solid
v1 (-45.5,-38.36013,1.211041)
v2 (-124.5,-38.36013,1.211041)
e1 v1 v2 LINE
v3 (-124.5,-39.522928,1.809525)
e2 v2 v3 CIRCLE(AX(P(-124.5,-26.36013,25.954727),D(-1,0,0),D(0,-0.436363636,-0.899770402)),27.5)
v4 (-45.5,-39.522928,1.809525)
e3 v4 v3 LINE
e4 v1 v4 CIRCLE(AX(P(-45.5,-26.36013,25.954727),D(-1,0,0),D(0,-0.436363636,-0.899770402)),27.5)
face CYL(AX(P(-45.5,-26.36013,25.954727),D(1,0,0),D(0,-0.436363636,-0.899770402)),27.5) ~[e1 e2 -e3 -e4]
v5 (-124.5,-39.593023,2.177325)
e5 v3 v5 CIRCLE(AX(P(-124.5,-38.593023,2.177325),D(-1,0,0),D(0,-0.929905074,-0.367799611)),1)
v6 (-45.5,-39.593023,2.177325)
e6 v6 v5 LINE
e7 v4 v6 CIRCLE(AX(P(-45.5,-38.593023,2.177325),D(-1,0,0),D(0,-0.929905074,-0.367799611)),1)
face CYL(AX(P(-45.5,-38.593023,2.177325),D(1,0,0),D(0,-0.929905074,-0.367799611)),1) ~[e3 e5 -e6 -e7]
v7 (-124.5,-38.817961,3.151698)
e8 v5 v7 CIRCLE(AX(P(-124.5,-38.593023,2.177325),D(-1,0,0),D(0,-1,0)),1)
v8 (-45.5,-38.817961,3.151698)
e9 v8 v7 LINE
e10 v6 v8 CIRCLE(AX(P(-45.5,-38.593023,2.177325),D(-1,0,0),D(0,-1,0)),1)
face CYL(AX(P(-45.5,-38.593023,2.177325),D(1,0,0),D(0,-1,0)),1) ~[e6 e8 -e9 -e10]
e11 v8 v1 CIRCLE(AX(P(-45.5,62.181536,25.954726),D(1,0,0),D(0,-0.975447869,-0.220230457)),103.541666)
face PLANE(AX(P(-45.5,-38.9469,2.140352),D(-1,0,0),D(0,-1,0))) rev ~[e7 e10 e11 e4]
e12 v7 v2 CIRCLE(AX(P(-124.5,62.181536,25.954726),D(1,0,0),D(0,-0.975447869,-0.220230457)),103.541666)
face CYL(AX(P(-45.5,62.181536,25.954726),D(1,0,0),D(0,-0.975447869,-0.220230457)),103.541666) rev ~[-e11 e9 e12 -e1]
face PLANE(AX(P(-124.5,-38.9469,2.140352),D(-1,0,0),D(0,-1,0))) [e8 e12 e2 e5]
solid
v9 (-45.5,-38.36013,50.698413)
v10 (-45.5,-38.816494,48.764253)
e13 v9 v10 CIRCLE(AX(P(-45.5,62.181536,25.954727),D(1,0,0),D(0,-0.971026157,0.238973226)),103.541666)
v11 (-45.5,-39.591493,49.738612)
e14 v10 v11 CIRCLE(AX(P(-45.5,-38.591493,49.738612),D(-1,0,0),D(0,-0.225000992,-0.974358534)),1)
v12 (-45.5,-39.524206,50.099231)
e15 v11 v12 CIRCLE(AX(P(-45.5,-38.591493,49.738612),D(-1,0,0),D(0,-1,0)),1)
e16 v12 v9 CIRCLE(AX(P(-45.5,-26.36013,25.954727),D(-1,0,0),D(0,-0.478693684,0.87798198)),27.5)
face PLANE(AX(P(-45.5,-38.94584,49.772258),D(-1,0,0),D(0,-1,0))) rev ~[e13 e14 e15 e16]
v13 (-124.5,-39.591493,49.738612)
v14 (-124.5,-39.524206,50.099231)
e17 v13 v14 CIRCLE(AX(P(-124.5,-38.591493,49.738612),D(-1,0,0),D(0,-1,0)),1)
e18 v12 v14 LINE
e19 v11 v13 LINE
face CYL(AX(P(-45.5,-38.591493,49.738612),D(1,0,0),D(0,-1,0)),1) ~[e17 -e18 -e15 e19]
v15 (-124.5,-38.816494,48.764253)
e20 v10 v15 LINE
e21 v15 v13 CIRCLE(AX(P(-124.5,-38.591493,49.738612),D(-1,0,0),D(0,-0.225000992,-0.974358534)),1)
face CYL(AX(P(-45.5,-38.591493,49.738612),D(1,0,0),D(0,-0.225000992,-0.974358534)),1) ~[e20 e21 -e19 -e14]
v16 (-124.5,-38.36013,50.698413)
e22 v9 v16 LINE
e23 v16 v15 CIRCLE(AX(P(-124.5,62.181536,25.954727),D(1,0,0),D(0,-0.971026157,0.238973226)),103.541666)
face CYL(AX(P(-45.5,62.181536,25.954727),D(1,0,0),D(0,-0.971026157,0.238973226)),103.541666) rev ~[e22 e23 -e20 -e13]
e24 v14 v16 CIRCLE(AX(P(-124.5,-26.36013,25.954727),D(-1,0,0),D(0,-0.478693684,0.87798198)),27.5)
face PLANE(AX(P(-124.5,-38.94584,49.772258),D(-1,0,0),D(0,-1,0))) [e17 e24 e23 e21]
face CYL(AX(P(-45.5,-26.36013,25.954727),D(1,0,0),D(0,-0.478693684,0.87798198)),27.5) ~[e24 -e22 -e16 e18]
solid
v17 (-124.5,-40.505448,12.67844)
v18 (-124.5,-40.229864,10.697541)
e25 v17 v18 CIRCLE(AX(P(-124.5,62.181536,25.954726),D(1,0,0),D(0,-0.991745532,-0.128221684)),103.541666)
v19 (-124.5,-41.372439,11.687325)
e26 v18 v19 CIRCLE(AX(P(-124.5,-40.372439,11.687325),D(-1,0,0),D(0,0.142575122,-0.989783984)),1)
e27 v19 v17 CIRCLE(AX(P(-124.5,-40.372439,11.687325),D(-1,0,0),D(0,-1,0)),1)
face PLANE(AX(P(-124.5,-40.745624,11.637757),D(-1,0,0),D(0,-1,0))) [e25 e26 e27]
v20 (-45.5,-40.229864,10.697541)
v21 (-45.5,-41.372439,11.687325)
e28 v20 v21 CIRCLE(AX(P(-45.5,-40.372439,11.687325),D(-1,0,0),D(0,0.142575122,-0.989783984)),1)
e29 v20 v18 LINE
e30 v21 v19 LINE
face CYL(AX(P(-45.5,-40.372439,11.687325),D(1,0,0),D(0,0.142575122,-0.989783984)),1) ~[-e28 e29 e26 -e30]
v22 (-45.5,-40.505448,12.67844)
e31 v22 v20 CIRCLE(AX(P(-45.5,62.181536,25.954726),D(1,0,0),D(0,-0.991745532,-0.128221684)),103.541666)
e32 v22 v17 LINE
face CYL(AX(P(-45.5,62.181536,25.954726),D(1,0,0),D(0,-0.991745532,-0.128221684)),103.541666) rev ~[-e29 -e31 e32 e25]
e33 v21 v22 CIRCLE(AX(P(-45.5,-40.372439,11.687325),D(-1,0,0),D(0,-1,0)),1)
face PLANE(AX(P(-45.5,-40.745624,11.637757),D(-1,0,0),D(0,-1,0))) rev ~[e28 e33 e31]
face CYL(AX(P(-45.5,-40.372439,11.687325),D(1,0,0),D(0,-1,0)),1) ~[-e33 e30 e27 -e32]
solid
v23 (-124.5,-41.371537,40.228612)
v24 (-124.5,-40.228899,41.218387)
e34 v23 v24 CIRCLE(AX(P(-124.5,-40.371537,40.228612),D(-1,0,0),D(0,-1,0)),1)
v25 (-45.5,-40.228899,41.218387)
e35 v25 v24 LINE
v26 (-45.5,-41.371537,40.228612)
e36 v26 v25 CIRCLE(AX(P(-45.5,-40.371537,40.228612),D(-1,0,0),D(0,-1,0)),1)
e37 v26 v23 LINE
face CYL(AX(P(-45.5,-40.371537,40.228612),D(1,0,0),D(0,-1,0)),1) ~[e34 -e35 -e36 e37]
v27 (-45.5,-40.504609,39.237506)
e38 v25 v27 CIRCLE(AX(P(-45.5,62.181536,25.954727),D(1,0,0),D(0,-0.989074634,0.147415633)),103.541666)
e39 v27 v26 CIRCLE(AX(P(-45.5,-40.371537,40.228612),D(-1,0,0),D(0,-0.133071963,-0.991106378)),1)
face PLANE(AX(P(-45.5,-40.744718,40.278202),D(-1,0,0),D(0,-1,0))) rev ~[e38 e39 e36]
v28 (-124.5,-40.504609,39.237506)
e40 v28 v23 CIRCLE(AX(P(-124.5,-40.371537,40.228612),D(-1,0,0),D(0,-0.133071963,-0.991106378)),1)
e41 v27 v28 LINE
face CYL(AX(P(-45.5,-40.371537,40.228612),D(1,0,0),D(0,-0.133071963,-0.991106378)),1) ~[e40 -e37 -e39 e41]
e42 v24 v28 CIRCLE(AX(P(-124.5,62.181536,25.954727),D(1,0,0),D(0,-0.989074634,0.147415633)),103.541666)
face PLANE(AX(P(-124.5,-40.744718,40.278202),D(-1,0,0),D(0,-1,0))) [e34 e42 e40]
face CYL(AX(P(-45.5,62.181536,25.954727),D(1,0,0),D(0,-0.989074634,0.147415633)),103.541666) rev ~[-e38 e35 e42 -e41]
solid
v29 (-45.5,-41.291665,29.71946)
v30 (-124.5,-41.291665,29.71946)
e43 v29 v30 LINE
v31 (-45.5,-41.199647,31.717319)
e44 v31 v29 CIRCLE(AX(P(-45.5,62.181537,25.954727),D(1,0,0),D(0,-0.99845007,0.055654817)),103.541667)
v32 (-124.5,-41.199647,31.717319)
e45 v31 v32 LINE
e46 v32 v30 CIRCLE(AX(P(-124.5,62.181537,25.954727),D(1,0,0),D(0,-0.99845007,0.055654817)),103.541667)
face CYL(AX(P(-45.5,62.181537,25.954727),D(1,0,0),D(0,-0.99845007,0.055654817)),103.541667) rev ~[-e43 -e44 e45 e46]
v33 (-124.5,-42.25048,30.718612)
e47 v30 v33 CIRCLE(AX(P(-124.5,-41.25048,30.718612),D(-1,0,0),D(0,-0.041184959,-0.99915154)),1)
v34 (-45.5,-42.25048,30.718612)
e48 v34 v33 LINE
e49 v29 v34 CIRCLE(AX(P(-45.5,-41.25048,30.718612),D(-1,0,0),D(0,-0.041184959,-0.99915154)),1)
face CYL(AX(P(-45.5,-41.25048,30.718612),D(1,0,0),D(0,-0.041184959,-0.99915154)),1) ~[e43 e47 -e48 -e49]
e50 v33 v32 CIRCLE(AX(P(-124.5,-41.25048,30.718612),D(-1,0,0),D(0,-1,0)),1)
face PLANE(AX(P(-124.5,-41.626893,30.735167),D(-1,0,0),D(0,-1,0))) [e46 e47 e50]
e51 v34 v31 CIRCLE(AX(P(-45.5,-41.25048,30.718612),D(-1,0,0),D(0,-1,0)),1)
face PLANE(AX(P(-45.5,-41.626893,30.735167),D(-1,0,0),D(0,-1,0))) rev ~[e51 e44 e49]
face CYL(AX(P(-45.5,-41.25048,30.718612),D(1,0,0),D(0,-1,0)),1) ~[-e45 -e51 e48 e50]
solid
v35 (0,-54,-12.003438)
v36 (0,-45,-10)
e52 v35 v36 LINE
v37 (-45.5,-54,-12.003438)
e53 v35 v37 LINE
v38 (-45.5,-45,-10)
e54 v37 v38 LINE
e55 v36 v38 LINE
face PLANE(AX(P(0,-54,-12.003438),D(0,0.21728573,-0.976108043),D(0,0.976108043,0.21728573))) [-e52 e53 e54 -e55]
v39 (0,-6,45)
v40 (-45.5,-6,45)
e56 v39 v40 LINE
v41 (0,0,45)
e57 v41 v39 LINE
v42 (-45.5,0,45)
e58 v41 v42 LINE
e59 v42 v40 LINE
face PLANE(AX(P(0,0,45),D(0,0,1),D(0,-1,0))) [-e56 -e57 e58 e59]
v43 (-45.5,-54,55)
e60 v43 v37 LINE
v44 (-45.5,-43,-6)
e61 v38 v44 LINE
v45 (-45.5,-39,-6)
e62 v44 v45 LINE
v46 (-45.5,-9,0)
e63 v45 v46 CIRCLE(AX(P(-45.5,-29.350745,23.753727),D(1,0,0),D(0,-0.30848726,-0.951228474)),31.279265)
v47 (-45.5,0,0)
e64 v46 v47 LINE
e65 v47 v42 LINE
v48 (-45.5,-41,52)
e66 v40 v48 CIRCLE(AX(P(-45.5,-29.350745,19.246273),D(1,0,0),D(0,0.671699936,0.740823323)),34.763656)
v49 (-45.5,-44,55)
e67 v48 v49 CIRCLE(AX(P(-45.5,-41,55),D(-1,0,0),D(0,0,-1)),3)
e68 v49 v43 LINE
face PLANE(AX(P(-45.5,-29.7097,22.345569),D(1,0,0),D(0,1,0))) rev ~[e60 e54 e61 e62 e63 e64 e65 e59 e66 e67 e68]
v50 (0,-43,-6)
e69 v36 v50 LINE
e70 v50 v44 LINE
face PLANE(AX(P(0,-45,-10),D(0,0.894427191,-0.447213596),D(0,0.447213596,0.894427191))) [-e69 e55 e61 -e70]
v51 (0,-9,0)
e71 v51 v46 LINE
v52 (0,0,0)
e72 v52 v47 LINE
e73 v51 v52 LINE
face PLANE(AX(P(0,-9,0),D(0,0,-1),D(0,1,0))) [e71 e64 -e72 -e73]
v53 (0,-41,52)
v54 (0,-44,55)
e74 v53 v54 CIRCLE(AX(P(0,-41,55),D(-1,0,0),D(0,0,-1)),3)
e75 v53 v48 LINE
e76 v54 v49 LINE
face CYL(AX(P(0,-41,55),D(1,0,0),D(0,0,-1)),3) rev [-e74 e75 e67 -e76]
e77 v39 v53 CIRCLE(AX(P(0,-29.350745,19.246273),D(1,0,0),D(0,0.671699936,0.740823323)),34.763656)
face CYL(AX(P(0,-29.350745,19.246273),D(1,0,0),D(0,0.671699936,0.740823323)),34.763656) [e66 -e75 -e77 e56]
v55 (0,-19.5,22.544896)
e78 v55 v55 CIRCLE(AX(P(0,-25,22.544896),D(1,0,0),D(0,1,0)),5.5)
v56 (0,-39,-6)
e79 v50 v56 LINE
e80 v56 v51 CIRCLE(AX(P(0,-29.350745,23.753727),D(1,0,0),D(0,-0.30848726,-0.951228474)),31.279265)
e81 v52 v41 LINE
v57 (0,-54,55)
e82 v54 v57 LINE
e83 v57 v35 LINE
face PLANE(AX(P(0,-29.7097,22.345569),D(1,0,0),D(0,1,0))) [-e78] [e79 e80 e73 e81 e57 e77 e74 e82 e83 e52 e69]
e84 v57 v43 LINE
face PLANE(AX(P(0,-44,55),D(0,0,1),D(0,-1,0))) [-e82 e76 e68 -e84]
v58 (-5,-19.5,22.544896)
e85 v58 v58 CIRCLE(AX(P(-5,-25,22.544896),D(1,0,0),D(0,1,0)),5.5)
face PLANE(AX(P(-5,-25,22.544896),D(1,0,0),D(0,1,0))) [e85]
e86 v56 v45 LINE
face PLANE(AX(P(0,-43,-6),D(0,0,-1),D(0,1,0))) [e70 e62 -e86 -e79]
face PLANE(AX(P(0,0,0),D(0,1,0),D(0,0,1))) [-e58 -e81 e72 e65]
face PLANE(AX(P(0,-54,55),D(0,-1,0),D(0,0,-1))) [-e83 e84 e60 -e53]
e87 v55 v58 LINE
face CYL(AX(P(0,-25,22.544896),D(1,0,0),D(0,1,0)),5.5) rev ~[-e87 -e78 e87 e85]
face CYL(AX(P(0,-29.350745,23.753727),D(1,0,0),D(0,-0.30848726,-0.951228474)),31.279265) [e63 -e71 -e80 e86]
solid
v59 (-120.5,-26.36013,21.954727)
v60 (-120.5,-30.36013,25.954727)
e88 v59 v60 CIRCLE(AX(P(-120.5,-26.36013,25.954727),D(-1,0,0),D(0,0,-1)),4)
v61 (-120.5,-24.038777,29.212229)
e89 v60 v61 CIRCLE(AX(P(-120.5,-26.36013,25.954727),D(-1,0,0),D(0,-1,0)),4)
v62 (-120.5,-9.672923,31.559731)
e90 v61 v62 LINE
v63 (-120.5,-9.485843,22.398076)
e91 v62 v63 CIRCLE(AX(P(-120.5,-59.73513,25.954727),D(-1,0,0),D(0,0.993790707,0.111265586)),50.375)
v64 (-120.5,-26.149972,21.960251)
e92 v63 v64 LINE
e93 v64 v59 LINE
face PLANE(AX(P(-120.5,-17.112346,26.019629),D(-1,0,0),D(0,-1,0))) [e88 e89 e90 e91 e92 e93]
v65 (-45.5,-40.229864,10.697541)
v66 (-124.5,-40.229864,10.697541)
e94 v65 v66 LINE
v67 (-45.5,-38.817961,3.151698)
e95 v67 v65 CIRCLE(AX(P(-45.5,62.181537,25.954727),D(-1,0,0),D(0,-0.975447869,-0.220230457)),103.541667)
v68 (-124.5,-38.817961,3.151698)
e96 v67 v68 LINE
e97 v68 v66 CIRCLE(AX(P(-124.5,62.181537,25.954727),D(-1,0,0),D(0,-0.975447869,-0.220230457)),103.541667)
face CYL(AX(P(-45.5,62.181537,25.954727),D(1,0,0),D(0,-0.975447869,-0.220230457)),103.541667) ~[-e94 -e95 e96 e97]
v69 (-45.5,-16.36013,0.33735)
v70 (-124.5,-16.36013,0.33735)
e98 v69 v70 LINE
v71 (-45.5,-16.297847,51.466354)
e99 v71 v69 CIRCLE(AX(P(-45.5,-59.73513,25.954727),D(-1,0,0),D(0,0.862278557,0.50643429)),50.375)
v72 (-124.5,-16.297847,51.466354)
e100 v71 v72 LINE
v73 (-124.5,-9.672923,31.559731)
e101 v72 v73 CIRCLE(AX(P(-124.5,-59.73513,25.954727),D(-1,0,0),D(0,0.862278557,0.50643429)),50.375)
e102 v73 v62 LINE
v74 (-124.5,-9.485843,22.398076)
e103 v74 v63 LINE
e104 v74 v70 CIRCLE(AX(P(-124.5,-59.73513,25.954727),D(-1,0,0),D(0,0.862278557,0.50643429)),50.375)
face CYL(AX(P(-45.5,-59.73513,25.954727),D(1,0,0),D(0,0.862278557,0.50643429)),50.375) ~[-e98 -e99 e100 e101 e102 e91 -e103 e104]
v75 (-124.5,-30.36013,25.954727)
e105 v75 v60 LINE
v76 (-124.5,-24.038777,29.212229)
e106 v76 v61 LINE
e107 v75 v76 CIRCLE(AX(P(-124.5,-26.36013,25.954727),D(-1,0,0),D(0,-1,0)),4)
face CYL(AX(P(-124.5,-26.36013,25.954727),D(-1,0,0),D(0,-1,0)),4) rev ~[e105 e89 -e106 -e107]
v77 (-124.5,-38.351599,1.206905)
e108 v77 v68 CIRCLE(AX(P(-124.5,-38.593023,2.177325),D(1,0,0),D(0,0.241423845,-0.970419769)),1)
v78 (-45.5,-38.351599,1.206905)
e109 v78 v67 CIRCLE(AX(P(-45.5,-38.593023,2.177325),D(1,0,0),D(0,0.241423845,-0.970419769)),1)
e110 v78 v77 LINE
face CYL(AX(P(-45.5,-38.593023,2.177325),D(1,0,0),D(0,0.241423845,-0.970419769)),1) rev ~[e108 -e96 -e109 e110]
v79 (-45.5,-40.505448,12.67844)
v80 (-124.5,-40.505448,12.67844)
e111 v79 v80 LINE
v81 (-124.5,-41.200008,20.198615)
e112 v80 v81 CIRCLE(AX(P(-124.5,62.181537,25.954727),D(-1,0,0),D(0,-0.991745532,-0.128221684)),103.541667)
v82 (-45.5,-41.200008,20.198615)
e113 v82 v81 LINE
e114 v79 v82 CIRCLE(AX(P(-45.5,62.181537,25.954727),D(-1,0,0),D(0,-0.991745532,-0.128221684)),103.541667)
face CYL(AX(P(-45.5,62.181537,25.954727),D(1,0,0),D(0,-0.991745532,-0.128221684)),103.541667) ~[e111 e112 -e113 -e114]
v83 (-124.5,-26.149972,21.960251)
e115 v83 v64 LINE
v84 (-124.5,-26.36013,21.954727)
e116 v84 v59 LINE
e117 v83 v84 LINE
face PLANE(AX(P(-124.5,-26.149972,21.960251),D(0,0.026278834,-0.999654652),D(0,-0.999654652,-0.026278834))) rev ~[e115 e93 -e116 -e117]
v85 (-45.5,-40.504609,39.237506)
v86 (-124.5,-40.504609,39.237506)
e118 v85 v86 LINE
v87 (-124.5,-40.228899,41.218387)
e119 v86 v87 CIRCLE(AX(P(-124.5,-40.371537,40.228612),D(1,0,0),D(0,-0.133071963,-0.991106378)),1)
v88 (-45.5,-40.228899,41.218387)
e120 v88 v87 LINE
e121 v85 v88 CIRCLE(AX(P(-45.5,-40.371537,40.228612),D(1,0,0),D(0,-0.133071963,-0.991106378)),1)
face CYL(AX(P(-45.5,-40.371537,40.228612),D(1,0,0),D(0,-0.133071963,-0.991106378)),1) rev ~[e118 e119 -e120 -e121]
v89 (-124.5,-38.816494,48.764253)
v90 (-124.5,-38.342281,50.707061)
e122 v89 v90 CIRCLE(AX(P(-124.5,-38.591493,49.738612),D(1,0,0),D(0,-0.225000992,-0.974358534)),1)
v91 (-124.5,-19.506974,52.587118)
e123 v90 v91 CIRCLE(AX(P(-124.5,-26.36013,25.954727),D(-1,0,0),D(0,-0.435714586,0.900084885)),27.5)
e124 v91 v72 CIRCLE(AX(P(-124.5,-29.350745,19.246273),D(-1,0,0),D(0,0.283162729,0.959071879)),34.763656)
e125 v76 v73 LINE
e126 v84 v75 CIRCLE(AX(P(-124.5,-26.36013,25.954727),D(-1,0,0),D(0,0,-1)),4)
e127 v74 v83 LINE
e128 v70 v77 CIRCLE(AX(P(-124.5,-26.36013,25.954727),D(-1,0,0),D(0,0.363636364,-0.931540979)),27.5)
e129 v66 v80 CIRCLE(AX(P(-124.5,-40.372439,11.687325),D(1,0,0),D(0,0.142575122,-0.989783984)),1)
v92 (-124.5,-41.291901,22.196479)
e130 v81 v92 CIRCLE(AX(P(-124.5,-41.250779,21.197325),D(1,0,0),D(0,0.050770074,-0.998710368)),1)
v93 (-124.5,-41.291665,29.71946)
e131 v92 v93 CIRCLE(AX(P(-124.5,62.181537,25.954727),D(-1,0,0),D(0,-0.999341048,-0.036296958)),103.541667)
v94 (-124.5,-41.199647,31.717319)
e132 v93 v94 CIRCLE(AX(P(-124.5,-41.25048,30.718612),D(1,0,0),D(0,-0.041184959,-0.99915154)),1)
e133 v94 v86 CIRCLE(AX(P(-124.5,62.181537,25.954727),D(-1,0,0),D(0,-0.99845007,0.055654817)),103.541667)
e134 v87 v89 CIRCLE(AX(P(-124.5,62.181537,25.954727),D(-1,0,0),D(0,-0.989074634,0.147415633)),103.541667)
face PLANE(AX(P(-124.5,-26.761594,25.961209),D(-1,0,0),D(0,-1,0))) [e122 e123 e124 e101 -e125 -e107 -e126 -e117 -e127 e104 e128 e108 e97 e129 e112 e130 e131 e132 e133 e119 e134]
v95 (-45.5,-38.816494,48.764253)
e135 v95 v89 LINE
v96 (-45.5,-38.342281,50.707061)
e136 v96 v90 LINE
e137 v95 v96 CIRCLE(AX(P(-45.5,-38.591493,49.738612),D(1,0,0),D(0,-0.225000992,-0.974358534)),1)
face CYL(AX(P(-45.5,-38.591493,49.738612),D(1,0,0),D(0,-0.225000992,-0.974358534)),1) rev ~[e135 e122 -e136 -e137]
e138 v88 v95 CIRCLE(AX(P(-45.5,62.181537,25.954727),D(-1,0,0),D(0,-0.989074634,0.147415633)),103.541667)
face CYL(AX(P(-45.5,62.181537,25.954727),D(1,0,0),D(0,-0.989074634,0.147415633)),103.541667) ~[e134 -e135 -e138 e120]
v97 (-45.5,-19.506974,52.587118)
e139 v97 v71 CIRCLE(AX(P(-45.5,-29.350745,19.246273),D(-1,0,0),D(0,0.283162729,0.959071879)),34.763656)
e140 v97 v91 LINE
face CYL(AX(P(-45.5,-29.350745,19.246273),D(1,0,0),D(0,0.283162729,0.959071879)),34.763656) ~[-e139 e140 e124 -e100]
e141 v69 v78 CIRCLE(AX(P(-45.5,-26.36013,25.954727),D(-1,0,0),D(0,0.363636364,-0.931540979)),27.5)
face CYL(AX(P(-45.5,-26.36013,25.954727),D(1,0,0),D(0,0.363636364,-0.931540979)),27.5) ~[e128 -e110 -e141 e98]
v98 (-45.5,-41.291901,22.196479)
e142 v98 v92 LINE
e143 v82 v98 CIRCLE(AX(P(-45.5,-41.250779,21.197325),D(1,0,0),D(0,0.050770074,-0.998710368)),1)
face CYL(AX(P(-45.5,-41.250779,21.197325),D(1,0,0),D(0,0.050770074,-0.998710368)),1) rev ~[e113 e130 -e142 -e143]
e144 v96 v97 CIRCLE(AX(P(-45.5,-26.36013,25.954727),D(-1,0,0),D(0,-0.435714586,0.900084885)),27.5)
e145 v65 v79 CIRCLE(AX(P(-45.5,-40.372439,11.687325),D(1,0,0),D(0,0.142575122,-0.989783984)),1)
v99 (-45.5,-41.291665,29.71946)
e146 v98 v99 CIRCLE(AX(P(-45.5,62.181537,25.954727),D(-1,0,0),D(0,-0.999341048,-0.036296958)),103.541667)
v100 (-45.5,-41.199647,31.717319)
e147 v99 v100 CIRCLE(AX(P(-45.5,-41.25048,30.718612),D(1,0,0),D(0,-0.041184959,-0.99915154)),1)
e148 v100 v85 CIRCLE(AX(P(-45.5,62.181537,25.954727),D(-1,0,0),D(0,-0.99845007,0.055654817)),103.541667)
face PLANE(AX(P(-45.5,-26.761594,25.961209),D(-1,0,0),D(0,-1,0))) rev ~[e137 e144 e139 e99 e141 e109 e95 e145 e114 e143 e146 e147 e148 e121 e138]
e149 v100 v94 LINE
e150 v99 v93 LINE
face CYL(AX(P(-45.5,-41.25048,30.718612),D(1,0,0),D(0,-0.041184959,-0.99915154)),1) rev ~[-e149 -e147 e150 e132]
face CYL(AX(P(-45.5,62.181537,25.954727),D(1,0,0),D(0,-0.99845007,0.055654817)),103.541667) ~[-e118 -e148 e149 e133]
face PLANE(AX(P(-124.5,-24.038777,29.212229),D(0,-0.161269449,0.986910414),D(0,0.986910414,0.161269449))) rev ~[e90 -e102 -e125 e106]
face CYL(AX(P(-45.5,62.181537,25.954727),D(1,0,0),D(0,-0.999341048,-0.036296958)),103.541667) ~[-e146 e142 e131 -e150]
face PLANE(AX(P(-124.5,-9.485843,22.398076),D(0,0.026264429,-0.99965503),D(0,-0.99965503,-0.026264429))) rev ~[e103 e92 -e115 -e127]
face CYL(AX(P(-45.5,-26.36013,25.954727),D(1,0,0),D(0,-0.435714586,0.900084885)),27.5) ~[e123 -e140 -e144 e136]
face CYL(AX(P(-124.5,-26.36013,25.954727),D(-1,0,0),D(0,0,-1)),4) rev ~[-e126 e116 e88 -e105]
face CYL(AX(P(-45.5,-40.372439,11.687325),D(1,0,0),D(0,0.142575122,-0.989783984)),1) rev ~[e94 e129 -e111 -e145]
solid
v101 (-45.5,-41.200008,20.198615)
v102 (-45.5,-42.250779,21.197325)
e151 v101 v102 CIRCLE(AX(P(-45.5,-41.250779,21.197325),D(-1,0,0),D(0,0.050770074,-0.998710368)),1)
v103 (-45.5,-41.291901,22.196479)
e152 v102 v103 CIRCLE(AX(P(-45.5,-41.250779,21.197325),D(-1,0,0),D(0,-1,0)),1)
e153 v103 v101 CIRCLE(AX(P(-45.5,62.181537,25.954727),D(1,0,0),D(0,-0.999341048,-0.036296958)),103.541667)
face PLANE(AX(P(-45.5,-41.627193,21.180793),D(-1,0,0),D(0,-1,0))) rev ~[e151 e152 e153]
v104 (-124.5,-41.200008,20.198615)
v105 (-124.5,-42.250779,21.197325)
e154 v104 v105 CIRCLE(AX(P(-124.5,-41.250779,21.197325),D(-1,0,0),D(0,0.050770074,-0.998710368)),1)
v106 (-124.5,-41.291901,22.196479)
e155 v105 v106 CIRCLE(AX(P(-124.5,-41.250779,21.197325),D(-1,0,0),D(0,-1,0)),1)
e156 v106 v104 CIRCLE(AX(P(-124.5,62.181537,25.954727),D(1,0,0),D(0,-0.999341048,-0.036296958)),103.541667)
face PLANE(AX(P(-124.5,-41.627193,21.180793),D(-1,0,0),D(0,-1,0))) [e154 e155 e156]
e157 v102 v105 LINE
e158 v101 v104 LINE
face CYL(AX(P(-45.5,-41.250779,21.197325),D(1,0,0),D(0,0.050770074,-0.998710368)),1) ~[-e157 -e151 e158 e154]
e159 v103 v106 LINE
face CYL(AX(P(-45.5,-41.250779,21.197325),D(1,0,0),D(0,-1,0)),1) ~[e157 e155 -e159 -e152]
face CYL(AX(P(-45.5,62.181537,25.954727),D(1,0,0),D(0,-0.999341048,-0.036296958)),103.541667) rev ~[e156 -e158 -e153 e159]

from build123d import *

# Parameters (mm, degrees)
F1_DEPTH = 45.5
F2_R     = 5.5
F3_DEPTH = 5
F5_DEPTH = 79
F7_DEPTH = 4


# Not quite as in the source:
# - ends of sketch curves that miss each other by under 0.0002 mm in the source are joined


with BuildPart() as f1:
    # F0 (on Right) → F1 (new body)
    with BuildSketch(Plane.YZ):
        with BuildLine():
            Line((-9, 0), (0, 0))
            Line((0, 0), (0, 45))
            Line((0, 45), (-6, 45))
            ThreePointArc((-6, 45), (-22.5330315813, 53.3348420934), (-41, 52))
            ThreePointArc((-41, 52), (-43.1213203436, 52.8786796564), (-44, 55))
            Line((-44, 55), (-54, 55))
            Line((-54, 55), (-54, -12.0034376159))
            Line((-54, -12.0034376159), (-45, -10))
            Line((-45, -10), (-43, -6))
            Line((-43, -6), (-39, -6))
            ThreePointArc((-39, -6), (-23.216376947, -6.9181152652), (-9, 0))
        make_face()
    extrude(amount=-F1_DEPTH)

    # F2 (on face) → F3 (cut)
    with BuildSketch(Plane.YZ):
        with Locations((-25, 22.5448962301)):
            Circle(F2_R)
    extrude(amount=-F3_DEPTH, mode=Mode.SUBTRACT)


with BuildPart() as f5:
    # F4 (on face) → F5 (new body)
    with BuildSketch(Plane(origin=(-45.5, 0, 0), x_dir=(0, -1, 0), z_dir=(-1, 0, 0))):
        with BuildLine():
            ThreePointArc((39.5914929211, 49.738612026), (39.5745273011, 49.9220334198), (39.5242061057, 50.0992310984))
            ThreePointArc((39.5242061057, 50.0992310984), (38.9457342247, 50.4057503771), (38.3601298002, 50.698412714))
            ThreePointArc((38.3601298002, 50.698412714), (38.5929522401, 49.7324279994), (38.8164939134, 48.7642534916))
            ThreePointArc((38.8164939134, 48.7642534916), (39.3741170302, 49.1161174446), (39.5914929211, 49.738612026))
        make_face()
    extrude(amount=F5_DEPTH)


with BuildPart() as f5b:
    # F4 (on face) → F5, piece 2 (new body)
    with BuildSketch(Plane(origin=(-45.5, 0, 0), x_dir=(0, -1, 0), z_dir=(-1, 0, 0))):
        with BuildLine():
            ThreePointArc((38.3601298002, 1.2110405874), (38.9450870807, 1.5033698326), (39.5229280333, 1.8095254158))
            ThreePointArc((39.5229280333, 1.8095254158), (39.5753429364, 1.9901153498), (39.5930229595, 2.1773250267))
            ThreePointArc((39.5930229595, 2.1773250267), (39.3756270427, 2.7998447846), (38.8179612614, 3.1516980355))
            ThreePointArc((38.8179612614, 3.1516980355), (38.5937171125, 2.1802672122), (38.3601298002, 1.2110405874))
        make_face()
    extrude(amount=F5_DEPTH)


with BuildPart() as f5c:
    # F4 (on face) → F5, piece 3 (new body)
    with BuildSketch(Plane(origin=(-45.5, 0, 0), x_dir=(0, -1, 0), z_dir=(-1, 0, 0))):
        with BuildLine():
            ThreePointArc((38.8164939134, 48.7642534916), (37.6200137516, 49.5014871154), (38.342280913, 50.7070609792))
            ThreePointArc((38.342280913, 50.7070609792), (29.091484933, 53.3187486346), (19.5069737394, 52.5871176813))
            ThreePointArc((19.5069737394, 52.5871176813), (17.8887038243, 52.065983046), (16.297847496, 51.4663540199))
            ThreePointArc((16.297847496, 51.4663540199), (9.360167175, 25.8933628751), (16.3601298002, 0.3373497358))
            ThreePointArc((16.3601298002, 0.3373497358), (27.4466468085, -1.5238009807), (38.3515991148, 1.2069052581))
            ThreePointArc((38.3515991148, 1.2069052581), (37.6205916355, 2.4105144775), (38.8179612614, 3.1516980355))
            ThreePointArc((38.8179612614, 3.1516980355), (39.5938697508, 6.9115298603), (40.2298639805, 10.6975410429))
            ThreePointArc((40.2298639805, 10.6975410429), (39.3819781674, 11.8251188452), (40.5054484043, 12.678439816))
            ThreePointArc((40.5054484043, 12.678439816), (40.9213150894, 16.432192603), (41.2000084443, 20.1986146585))
            ThreePointArc((41.2000084443, 20.1986146585), (40.2518346275, 21.2432717627), (41.2919008449, 22.1964791461))
            ThreePointArc((41.2919008449, 22.1964791461), (41.3601297494, 25.9579719584), (41.291665052, 29.7194604864))
            ThreePointArc((41.291665052, 29.7194604864), (40.2515390839, 30.6726026702), (41.1996474134, 31.7173192096))
            ThreePointArc((41.1996474134, 31.7173192096), (40.9207153981, 35.4837514741), (40.5046088311, 39.2375056479))
            ThreePointArc((40.5046088311, 39.2375056479), (39.3810846469, 40.0907555877), (40.2288991693, 41.2183869938))
            ThreePointArc((40.2288991693, 41.2183869938), (39.5926549425, 45.0044147778), (38.8164939134, 48.7642534916))
        make_face()
    extrude(amount=F5_DEPTH)

    # F6 (on face) → F7 (cut)
    with BuildSketch(Plane(origin=(-124.5, 0, 0), x_dir=(0, -1, 0), z_dir=(-1, 0, 0))):
        with BuildLine():
            ThreePointArc((26.1499717328, 21.9602512675), (22.519565713, 24.8366624789), (24.0387774872, 29.212229289))
            Line((24.0387774872, 29.212229289), (9.6729229343, 31.5597305505))
            ThreePointArc((9.6729229343, 31.5597305505), (9.3706290349, 26.98316608), (9.4858426199, 22.3980761372))
            Line((9.4858426199, 22.3980761372), (26.1499717328, 21.9602512675))
        make_face()
        with BuildLine():
            ThreePointArc((26.3601298002, 21.9547266507), (29.188556925, 23.1262995259), (30.3601298002, 25.9547266507))
            ThreePointArc((30.3601298002, 25.9547266507), (28.1924221824, 29.510384765), (24.0387774872, 29.212229289))
            ThreePointArc((24.0387774872, 29.212229289), (22.519565713, 24.8366624789), (26.1499717328, 21.9602512675))
            Line((26.1499717328, 21.9602512675), (26.3601298002, 21.9547266507))
        make_face()
    extrude(amount=-F7_DEPTH, mode=Mode.SUBTRACT)


with BuildPart() as f5d:
    # F4 (on face) → F5, piece 4 (new body)
    with BuildSketch(Plane(origin=(-45.5, 0, 0), x_dir=(0, -1, 0), z_dir=(-1, 0, 0))):
        with BuildLine():
            ThreePointArc((41.3715368681, 40.228612026), (41.026274335, 40.9844683942), (40.2288991693, 41.2183869938))
            ThreePointArc((40.2288991693, 41.2183869938), (40.3715368681, 40.228612026), (40.5046088311, 39.2375056479))
            ThreePointArc((40.5046088311, 39.2375056479), (41.1242227133, 39.5702321824), (41.3715368681, 40.228612026))
        make_face()
    extrude(amount=F5_DEPTH)


with BuildPart() as f5e:
    # F4 (on face) → F5, piece 5 (new body)
    with BuildSketch(Plane(origin=(-45.5, 0, 0), x_dir=(0, -1, 0), z_dir=(-1, 0, 0))):
        with BuildLine():
            ThreePointArc((40.5054484043, 12.678439816), (40.3724391024, 11.6873250267), (40.2298639805, 10.6975410429))
            ThreePointArc((40.2298639805, 10.6975410429), (41.0272004628, 10.9314893561), (41.3724391024, 11.6873250267))
            ThreePointArc((41.3724391024, 11.6873250267), (41.1251041347, 12.3457286635), (40.5054484043, 12.678439816))
        make_face()
    extrude(amount=F5_DEPTH)


with BuildPart() as f5f:
    # F4 (on face) → F5, piece 6 (new body)
    with BuildSketch(Plane(origin=(-45.5, 0, 0), x_dir=(0, -1, 0), z_dir=(-1, 0, 0))):
        with BuildLine():
            ThreePointArc((42.2504800927, 30.718612026), (41.9393804196, 31.443468108), (41.1996474134, 31.7173192096))
            ThreePointArc((41.1996474134, 31.7173192096), (41.2504800927, 30.718612026), (41.291665052, 29.7194604864))
            ThreePointArc((41.291665052, 29.7194604864), (41.9720010416, 30.0262194203), (42.2504800927, 30.718612026))
        make_face()
    extrude(amount=F5_DEPTH)


with BuildPart() as f5g:
    # F4 (on face) → F5, piece 7 (new body)
    with BuildSketch(Plane(origin=(-45.5, 0, 0), x_dir=(0, -1, 0), z_dir=(-1, 0, 0))):
        with BuildLine():
            ThreePointArc((41.2919008449, 22.1964791461), (41.2507785185, 21.1973250267), (41.2000084443, 20.1986146585))
            ThreePointArc((41.2000084443, 20.1986146585), (41.9397015642, 20.4724905372), (42.2507785185, 21.1973250267))
            ThreePointArc((42.2507785185, 21.1973250267), (41.9722777654, 21.8897402466), (41.2919008449, 22.1964791461))
        make_face()
    extrude(amount=F5_DEPTH)


solid = Compound([f1.part, f5.part, f5b.part, f5c.part, f5d.part, f5e.part, f5f.part, f5g.part])
